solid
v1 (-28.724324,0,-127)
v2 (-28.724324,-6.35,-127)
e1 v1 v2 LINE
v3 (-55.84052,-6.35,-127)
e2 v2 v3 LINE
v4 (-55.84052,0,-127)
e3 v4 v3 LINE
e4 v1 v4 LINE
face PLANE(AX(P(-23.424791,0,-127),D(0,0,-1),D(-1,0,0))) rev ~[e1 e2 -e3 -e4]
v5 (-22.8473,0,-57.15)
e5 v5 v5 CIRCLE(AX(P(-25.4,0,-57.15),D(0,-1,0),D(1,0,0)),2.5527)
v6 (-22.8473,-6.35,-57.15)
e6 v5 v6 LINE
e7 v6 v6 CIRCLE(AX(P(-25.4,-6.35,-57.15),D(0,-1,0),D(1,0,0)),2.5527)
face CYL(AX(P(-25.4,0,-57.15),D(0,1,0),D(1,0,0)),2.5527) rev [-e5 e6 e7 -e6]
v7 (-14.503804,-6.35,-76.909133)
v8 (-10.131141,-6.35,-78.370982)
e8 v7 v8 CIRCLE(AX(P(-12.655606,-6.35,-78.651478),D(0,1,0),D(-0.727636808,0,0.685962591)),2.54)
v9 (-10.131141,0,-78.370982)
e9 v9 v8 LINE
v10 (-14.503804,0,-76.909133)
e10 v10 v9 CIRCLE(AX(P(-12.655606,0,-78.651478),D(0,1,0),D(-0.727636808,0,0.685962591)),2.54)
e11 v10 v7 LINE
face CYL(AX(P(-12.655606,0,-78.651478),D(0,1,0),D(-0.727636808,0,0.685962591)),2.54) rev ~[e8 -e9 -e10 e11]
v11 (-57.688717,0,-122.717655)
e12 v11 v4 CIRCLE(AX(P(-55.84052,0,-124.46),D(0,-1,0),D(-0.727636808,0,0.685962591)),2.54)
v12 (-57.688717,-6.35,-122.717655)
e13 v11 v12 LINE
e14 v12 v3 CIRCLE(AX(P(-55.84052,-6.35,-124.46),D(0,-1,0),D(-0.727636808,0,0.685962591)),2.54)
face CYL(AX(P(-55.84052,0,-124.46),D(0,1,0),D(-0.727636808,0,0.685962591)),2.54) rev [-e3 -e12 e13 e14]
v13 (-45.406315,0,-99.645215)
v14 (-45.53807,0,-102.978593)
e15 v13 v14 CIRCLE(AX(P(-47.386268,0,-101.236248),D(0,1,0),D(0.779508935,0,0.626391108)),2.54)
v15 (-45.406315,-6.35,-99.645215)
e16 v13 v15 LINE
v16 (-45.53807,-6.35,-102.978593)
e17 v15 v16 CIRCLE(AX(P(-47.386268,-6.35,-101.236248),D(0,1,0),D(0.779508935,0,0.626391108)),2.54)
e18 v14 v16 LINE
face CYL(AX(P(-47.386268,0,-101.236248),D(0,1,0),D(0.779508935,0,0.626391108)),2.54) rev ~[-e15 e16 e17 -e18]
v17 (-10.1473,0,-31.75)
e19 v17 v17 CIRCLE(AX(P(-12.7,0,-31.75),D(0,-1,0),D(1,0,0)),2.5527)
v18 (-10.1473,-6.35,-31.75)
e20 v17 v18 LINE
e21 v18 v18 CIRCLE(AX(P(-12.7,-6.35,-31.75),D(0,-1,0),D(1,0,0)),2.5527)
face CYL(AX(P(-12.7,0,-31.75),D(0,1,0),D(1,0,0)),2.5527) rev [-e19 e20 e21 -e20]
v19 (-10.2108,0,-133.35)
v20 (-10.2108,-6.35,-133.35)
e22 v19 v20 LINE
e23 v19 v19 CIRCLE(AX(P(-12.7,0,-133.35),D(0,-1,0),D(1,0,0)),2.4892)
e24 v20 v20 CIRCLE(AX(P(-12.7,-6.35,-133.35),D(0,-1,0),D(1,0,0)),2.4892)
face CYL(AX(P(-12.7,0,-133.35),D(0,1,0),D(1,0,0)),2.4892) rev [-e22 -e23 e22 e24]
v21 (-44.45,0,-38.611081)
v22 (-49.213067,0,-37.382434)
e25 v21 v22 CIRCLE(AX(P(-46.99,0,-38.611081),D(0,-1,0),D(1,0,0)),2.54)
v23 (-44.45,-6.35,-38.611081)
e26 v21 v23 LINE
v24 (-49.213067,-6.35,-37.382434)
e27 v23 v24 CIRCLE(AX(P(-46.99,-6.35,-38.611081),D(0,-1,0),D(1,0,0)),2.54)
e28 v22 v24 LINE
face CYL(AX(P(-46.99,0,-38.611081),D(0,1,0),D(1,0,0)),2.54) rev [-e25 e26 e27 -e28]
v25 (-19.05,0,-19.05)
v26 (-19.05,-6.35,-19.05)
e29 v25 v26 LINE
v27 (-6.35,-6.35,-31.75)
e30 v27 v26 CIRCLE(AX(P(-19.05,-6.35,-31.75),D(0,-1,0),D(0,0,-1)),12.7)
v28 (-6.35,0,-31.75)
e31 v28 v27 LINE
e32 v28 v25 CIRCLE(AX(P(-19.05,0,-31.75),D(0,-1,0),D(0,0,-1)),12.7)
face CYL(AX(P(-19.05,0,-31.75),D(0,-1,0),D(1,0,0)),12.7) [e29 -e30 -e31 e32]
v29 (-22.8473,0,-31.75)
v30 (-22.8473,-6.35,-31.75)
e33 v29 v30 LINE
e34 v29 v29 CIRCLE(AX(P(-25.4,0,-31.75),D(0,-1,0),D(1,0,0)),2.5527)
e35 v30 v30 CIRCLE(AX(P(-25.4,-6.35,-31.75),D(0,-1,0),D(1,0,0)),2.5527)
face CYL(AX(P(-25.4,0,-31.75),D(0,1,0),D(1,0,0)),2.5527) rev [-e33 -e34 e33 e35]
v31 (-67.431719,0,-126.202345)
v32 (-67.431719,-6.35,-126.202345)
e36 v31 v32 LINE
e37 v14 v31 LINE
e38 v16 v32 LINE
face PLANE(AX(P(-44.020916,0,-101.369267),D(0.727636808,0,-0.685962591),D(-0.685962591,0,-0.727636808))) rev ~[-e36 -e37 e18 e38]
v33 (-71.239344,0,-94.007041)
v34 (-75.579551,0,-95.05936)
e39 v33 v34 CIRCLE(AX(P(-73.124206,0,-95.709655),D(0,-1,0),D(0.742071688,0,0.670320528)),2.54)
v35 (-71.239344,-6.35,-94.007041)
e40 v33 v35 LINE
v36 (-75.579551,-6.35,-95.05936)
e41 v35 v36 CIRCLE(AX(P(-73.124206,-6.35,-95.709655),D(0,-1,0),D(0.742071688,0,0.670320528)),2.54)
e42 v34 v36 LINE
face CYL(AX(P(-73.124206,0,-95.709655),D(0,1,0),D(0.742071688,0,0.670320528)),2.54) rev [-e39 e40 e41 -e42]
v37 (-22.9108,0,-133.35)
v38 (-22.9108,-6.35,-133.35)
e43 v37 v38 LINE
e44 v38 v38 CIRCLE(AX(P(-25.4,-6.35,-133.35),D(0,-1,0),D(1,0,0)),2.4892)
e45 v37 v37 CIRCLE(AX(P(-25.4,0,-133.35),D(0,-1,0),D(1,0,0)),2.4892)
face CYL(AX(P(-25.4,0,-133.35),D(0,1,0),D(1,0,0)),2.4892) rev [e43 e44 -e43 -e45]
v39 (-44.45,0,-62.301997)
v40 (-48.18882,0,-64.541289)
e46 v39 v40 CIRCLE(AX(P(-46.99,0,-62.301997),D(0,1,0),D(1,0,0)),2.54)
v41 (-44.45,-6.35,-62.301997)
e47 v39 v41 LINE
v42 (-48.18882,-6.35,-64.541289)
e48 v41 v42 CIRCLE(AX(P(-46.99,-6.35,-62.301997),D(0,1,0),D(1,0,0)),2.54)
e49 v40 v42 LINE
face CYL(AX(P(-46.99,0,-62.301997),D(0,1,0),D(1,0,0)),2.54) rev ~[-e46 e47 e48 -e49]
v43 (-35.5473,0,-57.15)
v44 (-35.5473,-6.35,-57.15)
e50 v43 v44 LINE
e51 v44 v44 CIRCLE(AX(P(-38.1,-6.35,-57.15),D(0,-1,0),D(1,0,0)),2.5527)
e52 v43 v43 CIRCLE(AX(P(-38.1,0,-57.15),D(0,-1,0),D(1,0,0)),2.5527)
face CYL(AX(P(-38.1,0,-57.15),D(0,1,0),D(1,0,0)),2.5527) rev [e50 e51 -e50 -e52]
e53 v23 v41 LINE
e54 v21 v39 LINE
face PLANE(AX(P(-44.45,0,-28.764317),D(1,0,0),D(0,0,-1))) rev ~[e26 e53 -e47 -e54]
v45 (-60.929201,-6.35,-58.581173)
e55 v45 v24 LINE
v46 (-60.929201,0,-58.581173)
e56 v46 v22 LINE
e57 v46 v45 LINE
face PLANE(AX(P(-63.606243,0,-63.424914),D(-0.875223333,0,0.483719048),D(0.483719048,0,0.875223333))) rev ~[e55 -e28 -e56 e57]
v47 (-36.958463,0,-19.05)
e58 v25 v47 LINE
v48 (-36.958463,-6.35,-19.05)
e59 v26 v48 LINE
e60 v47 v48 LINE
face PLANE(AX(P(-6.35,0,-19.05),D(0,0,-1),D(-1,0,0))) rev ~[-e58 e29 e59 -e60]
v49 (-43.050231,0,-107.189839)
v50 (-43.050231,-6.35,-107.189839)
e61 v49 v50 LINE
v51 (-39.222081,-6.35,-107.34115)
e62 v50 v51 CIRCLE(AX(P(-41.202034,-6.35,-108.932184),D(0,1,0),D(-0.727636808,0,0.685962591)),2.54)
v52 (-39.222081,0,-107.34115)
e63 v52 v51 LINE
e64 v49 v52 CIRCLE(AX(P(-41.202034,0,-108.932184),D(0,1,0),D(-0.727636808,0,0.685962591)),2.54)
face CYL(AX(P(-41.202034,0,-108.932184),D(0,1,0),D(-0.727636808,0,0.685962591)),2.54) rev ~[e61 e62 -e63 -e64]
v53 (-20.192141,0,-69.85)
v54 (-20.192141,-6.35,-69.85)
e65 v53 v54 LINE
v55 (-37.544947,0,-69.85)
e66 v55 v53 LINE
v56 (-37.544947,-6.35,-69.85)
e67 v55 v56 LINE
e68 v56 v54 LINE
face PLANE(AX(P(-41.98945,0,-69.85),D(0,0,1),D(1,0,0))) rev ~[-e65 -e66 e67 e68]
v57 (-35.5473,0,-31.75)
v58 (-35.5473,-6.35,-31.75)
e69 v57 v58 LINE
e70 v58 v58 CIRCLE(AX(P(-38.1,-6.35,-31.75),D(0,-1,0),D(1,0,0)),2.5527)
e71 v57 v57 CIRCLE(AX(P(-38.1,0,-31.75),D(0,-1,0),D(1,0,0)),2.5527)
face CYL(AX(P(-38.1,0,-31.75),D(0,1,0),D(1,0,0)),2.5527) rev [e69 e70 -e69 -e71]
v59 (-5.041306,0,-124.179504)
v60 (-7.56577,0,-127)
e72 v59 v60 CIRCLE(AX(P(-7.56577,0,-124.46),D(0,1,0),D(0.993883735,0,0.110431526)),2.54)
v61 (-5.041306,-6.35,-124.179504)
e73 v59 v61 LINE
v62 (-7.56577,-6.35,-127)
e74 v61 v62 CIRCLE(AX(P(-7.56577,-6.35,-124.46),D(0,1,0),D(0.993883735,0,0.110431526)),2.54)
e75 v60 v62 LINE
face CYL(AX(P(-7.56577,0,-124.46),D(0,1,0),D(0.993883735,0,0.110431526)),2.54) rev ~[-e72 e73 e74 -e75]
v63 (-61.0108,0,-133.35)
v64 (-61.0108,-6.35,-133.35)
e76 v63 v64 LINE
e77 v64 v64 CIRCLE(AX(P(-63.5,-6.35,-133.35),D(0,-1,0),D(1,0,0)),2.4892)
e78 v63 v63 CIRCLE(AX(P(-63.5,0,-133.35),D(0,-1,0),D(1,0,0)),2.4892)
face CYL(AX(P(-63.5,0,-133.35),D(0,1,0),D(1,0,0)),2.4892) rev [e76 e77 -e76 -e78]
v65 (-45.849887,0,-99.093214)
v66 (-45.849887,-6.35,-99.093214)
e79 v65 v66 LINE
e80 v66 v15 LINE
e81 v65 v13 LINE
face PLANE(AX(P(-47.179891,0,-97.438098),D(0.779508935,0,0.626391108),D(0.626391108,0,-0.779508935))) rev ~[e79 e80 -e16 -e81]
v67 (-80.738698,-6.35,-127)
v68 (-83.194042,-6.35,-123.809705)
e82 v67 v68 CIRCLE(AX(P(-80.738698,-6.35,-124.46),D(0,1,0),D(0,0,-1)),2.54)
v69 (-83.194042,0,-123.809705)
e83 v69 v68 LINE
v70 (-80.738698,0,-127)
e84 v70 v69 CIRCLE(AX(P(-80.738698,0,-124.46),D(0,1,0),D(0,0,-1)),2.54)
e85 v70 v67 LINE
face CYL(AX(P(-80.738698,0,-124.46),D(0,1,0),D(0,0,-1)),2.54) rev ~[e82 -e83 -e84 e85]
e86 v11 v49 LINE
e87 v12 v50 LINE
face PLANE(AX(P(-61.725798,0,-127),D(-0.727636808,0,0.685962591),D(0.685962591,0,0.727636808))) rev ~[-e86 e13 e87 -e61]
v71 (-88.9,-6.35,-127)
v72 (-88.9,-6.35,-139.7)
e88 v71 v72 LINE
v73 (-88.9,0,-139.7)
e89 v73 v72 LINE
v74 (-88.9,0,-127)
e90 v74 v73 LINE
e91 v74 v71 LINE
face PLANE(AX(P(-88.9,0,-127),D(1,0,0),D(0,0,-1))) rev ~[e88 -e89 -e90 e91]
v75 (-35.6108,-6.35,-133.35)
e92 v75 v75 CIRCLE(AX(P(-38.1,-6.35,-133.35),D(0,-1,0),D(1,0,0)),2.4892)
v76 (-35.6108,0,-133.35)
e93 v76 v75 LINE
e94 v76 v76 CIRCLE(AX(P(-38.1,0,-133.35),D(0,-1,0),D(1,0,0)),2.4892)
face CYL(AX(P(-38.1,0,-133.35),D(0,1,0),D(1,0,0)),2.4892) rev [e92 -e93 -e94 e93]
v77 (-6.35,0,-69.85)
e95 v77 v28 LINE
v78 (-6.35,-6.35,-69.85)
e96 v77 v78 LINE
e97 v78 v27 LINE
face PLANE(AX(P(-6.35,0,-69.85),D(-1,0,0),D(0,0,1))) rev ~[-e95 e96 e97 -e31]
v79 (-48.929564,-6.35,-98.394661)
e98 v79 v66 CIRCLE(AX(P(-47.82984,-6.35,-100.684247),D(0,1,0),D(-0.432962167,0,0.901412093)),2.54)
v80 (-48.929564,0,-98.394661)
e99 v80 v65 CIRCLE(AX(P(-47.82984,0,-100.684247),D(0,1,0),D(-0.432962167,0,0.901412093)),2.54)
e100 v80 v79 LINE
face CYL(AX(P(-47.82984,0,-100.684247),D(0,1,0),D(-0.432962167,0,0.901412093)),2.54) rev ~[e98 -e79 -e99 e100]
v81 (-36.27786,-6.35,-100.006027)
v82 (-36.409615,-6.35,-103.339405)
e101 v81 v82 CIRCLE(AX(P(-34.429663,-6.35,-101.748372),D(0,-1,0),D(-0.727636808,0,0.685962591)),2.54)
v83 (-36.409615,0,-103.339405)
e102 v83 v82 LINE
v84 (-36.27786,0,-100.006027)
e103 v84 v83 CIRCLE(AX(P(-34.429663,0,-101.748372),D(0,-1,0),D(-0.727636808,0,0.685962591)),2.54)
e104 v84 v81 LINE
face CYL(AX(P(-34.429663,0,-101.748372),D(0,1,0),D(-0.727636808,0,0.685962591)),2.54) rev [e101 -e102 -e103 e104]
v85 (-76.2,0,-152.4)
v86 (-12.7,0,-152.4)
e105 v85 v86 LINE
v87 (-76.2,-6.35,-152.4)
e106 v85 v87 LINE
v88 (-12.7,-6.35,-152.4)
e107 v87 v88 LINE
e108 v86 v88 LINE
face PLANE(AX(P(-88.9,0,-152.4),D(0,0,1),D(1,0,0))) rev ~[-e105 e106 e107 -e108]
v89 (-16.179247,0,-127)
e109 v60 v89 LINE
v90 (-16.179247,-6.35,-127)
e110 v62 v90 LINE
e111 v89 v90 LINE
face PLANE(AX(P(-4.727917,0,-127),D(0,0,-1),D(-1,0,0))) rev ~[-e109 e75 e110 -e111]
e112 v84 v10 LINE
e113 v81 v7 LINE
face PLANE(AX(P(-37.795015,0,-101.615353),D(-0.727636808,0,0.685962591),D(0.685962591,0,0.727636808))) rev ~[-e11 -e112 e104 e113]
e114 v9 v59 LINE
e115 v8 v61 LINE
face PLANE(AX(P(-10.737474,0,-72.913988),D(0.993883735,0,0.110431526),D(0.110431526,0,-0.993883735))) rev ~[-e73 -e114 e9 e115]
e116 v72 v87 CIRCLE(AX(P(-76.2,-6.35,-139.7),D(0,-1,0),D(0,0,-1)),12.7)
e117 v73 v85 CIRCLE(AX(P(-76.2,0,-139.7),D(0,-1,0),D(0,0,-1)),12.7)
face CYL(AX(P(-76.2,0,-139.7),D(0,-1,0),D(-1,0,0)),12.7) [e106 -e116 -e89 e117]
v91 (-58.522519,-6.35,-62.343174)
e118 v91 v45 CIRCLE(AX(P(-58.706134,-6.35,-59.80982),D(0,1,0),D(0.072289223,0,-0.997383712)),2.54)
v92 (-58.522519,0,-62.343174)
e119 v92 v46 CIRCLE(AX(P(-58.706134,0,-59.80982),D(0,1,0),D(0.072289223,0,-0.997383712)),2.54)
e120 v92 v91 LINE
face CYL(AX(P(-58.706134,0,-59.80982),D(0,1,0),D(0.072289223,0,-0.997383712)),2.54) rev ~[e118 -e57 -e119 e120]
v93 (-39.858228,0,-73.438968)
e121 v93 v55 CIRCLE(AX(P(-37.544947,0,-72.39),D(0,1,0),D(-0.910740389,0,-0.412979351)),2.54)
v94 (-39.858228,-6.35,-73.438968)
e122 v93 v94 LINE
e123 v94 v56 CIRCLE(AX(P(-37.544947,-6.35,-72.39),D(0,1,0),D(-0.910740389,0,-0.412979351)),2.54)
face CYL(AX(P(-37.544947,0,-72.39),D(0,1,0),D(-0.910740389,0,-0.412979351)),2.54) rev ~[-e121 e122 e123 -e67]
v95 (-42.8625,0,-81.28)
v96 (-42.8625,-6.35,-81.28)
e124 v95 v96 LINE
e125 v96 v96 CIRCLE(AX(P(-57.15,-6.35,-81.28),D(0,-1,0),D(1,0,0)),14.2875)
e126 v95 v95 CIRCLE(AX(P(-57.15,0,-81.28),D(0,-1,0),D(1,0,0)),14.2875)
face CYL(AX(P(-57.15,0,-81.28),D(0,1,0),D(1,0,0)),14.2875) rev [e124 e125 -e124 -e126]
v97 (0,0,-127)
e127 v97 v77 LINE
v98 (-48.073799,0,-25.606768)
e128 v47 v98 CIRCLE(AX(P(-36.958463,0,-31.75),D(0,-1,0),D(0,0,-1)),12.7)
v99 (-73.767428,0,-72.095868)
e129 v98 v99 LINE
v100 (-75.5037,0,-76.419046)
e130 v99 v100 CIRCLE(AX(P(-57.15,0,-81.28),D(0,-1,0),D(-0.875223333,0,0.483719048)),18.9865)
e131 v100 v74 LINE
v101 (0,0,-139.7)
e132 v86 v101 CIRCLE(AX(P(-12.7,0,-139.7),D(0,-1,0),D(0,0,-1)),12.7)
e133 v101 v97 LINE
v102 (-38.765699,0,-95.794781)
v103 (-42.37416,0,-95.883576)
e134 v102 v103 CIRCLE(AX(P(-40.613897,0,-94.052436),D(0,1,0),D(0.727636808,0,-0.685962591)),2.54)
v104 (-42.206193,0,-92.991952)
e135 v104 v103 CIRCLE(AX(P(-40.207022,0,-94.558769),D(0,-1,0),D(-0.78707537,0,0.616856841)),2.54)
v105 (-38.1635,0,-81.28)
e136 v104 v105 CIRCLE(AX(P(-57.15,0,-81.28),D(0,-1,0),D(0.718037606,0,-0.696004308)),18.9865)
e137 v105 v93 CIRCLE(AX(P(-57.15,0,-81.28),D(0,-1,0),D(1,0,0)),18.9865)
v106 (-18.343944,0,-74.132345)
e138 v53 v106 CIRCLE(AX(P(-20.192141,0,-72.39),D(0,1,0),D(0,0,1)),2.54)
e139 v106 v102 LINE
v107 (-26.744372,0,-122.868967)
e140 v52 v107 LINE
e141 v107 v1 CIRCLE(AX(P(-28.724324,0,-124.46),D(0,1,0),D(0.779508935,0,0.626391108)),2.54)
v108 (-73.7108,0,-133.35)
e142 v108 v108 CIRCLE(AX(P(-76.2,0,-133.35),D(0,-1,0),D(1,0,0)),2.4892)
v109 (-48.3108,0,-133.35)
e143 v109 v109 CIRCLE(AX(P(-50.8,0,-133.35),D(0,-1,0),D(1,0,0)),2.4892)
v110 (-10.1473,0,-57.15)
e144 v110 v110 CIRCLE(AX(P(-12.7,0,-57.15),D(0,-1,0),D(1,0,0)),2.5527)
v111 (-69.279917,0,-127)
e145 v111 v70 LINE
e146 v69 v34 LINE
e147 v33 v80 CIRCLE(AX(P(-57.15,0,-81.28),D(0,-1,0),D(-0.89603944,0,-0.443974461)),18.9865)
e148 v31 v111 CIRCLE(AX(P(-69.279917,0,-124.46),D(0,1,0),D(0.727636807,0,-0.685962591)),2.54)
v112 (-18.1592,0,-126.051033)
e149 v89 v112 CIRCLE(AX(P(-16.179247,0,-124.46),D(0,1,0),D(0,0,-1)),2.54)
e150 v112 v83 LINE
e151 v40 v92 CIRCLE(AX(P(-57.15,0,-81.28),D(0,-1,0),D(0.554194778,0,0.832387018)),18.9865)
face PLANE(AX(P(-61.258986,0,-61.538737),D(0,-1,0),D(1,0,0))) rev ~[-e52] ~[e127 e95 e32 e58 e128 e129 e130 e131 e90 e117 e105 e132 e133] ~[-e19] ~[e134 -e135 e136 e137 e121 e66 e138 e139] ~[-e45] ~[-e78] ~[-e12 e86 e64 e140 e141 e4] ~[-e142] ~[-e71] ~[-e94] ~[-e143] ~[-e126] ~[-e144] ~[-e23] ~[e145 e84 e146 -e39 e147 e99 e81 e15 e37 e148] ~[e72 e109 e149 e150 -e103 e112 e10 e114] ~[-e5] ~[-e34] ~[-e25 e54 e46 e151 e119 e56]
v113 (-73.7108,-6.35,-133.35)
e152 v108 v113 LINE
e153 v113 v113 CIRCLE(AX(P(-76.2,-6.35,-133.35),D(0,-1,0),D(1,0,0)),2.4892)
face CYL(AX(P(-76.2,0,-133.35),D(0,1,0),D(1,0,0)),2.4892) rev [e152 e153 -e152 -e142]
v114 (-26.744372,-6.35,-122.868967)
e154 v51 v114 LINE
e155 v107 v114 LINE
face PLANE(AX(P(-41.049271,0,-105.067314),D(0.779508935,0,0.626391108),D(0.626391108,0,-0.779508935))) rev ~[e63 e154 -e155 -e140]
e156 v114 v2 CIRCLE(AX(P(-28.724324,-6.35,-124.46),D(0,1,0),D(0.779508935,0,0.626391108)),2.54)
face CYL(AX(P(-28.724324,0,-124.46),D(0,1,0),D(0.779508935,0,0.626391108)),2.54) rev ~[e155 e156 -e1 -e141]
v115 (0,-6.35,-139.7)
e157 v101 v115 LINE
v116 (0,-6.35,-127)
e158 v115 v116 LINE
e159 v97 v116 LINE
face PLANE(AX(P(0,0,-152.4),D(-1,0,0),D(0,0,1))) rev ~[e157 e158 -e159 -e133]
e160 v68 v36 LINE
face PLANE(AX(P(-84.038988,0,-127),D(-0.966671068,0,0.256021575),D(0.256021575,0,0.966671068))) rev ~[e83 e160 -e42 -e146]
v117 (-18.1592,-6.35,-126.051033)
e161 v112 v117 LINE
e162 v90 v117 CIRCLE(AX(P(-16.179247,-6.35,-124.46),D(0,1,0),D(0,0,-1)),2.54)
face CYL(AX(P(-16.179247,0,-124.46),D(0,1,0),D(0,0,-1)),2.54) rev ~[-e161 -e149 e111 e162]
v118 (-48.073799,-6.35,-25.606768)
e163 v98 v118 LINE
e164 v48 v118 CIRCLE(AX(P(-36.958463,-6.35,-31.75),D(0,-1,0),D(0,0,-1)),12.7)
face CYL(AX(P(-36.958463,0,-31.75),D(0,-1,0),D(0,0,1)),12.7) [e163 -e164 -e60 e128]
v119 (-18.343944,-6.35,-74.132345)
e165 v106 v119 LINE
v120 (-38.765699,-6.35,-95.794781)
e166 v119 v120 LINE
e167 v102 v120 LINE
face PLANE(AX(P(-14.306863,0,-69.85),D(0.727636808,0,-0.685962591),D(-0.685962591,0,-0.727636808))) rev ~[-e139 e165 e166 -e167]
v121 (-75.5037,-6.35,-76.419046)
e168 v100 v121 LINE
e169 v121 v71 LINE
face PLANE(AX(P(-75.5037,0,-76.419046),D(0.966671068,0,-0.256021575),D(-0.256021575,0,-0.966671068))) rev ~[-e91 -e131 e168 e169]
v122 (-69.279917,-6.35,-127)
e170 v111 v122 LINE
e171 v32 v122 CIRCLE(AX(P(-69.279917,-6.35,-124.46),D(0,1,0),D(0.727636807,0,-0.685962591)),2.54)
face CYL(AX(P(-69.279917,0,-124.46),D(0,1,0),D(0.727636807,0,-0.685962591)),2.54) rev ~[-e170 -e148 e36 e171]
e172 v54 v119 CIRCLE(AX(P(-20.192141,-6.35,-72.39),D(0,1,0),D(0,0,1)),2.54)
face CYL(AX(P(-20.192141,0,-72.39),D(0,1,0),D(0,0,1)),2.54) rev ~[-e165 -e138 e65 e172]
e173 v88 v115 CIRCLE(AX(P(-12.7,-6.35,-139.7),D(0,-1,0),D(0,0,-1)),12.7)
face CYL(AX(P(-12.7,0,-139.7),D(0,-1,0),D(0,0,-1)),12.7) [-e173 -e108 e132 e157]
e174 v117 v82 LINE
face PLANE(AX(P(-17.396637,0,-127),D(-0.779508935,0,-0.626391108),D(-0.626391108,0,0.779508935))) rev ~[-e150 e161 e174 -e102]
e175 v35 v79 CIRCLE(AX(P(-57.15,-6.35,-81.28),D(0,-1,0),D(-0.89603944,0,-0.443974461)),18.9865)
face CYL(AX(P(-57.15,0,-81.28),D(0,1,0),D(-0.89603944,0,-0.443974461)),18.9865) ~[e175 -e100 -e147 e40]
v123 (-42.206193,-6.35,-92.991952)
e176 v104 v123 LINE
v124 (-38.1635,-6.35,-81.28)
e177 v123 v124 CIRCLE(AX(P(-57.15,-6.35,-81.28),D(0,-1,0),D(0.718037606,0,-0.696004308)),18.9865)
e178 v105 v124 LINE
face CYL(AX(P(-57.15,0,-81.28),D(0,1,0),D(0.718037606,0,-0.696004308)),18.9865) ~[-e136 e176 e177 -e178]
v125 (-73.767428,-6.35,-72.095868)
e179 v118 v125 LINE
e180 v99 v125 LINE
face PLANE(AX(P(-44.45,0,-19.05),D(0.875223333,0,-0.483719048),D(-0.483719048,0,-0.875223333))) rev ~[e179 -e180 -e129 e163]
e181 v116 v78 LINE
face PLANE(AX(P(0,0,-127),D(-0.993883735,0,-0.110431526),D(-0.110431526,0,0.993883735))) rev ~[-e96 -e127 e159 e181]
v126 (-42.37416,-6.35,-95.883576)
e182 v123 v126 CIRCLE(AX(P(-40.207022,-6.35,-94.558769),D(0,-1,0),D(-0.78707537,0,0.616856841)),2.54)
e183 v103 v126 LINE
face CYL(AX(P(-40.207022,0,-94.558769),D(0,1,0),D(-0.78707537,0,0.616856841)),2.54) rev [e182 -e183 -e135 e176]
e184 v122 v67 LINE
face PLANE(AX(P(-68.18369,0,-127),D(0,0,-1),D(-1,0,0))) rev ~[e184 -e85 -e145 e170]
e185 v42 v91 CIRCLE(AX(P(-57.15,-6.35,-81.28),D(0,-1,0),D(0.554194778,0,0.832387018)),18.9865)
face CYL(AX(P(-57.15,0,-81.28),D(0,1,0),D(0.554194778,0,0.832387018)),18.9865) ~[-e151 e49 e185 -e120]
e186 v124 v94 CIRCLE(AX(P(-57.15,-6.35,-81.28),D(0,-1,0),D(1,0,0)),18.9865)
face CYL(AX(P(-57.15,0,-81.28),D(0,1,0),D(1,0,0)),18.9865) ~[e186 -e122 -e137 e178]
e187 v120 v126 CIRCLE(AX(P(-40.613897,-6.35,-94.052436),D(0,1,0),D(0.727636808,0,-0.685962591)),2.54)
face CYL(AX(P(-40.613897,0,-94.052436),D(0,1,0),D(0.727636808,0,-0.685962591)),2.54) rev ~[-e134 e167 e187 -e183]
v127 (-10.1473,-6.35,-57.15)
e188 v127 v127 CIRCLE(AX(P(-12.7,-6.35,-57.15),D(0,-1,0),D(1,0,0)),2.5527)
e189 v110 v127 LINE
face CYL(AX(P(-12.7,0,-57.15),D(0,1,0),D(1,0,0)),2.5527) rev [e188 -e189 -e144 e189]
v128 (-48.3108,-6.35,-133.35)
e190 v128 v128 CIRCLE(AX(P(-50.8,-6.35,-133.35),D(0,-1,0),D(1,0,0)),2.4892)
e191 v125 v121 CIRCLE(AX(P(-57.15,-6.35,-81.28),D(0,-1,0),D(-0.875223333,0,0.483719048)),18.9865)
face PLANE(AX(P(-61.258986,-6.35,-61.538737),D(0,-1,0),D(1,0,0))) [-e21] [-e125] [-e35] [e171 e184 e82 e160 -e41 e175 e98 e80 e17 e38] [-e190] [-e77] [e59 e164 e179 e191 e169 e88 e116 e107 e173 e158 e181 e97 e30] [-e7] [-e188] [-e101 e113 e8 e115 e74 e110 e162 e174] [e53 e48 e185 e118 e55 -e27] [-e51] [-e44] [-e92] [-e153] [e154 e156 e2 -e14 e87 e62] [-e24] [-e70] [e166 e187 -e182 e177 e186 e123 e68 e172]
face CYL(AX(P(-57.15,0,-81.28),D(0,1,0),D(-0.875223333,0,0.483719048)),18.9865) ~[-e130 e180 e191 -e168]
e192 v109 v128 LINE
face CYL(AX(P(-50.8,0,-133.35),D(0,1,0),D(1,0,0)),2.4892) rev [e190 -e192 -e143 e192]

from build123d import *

# Parameters (mm, degrees)
F0_R        = 14.2875
F0_R_2      = 2.4892
F0_R_3      = 2.5527
F1_DEPTH    = 6.35
F2_R        = 12.7
F3_T1_DEPTH = 6.35


# Not quite as in the source:
# - a fillet or chamfer that OpenCascade refuses, or shapes differently, is made with other operations: its cross-section is extruded or revolved along the edge and cut away or added


with BuildPart() as f1:
    # F0 (on Front) → F1 (new body)
    with BuildSketch(Plane.XZ):
        with BuildLine():
            ThreePointArc((-73.767427816, -72.0958683029), (-74.7686667008, -74.2040007111), (-75.5037002278, -76.4190463696))
            ThreePointArc((-75.5037002278, -76.4190463696), (-76.040577327, -83.1861139792), (-74.1626528233, -89.7095211112))
            ThreePointArc((-74.1626528233, -89.7095211112), (-62.3780093009, -99.5325368374), (-47.1798914821, -97.4380976105))
            ThreePointArc((-47.1798914821, -97.4380976105), (-45.257025222, -96.0801463905), (-43.5169789975, -94.4946857926))
            ThreePointArc((-43.5169789975, -94.4946857926), (-39.5526914627, -88.4089490455), (-38.1635, -81.28))
            ThreePointArc((-38.1635, -81.28), (-39.1453760307, -75.2533344231), (-41.9894498038, -69.85))
            Line((-41.9894498038, -69.85), (-44.1945328452, -69.85))
            Line((-44.1945328452, -69.85), (-44.45, -69.85))
            Line((-44.45, -69.85), (-44.45, -67.1662768112))
            ThreePointArc((-44.45, -67.1662768112), (-45.5081692727, -66.2815014229), (-46.6277808452, -65.4758838808))
            ThreePointArc((-46.6277808452, -65.4758838808), (-54.8730151863, -62.430529917), (-63.6062431678, -63.4249137104))
            ThreePointArc((-63.6062431678, -63.4249137104), (-69.474566384, -66.8372770678), (-73.767427816, -72.0958683029))
        make_face()
        with Locations((-57.15, -81.28)):
            Circle(F0_R, mode=Mode.SUBTRACT)
        with BuildLine():
            Line((-44.45, -28.7643166542), (-44.45, -19.05))
            Line((-44.45, -19.05), (-73.767427816, -72.0958683029))
            ThreePointArc((-73.767427816, -72.0958683029), (-69.474566384, -66.8372770678), (-63.6062431678, -63.4249137104))
            Line((-63.6062431678, -63.4249137104), (-44.45, -28.7643166542))
        make_face()
        with BuildLine():
            Line((-75.5037002278, -76.4190463696), (-88.9, -127))
            Line((-88.9, -127), (-84.0389876487, -127))
            Line((-84.0389876487, -127), (-74.1626528233, -89.7095211112))
            ThreePointArc((-74.1626528233, -89.7095211112), (-76.040577327, -83.1861139792), (-75.5037002278, -76.4190463696))
        make_face()
        Polygon((-84.0389876487, -127), (-88.9, -127), (-88.9, -152.4), (0, -152.4), (0, -127), (-4.727917196, -127), (-17.3966372237, -127), (-23.4247913477, -127), (-61.7257976966, -127), (-68.1836898087, -127), align=None)
        with Locations((-76.2, -133.35)):
            Circle(F0_R_2, mode=Mode.SUBTRACT)
        with Locations((-63.5, -133.35)):
            Circle(F0_R_2, mode=Mode.SUBTRACT)
        with Locations((-50.8, -133.35)):
            Circle(F0_R_2, mode=Mode.SUBTRACT)
        with Locations((-38.1, -133.35)):
            Circle(F0_R_2, mode=Mode.SUBTRACT)
        with Locations((-25.4, -133.35)):
            Circle(F0_R_2, mode=Mode.SUBTRACT)
        with Locations((-12.7, -133.35)):
            Circle(F0_R_2, mode=Mode.SUBTRACT)
        Polygon((-4.727917196, -127), (0, -127), (-6.35, -69.85), (-11.077917196, -69.85), (-10.7374740973, -72.913987888), align=None)
        with BuildLine():
            Line((-6.35, -69.85), (-6.35, -19.05))
            Line((-6.35, -19.05), (-44.45, -19.05))
            Line((-44.45, -19.05), (-44.45, -28.7643166542))
            Line((-44.45, -28.7643166542), (-44.45, -62.9496581004))
            Line((-44.45, -62.9496581004), (-44.45, -67.1662768112))
            ThreePointArc((-44.45, -67.1662768112), (-43.7416474883, -67.8374085396), (-43.0687114356, -68.5440471649))
            ThreePointArc((-43.0687114356, -68.5440471649), (-42.5145067823, -69.1849795153), (-41.9894498038, -69.85))
            Line((-41.9894498038, -69.85), (-14.3068632521, -69.85))
            Line((-14.3068632521, -69.85), (-11.077917196, -69.85))
            Line((-11.077917196, -69.85), (-6.35, -69.85))
        make_face()
        with Locations((-38.1, -57.15)):
            Circle(F0_R_3, mode=Mode.SUBTRACT)
        with Locations((-25.4, -57.15)):
            Circle(F0_R_3, mode=Mode.SUBTRACT)
        with Locations((-12.7, -57.15)):
            Circle(F0_R_3, mode=Mode.SUBTRACT)
        with Locations((-38.1, -31.75)):
            Circle(F0_R_3, mode=Mode.SUBTRACT)
        with Locations((-25.4, -31.75)):
            Circle(F0_R_3, mode=Mode.SUBTRACT)
        with Locations((-12.7, -31.75)):
            Circle(F0_R_3, mode=Mode.SUBTRACT)
        Polygon((-44.0209157758, -101.3692673783), (-68.1836898087, -127), (-61.7257976966, -127), (-41.0492709397, -105.0673142856), align=None)
        Polygon((-40.7666595063, -97.9173056039), (-44.0209157758, -101.3692673783), (-41.0492709397, -105.0673142856), (-37.7950146701, -101.6153525111), align=None)
        Polygon((-10.7374740973, -72.913987888), (-11.077917196, -69.85), (-14.3068632521, -69.85), (-40.7666595063, -97.9173056039), (-37.7950146701, -101.6153525111), align=None)
        with BuildLine():
            Line((-47.1798914821, -97.4380976105), (-44.0209157758, -101.3692673783))
            Line((-44.0209157758, -101.3692673783), (-40.7666595063, -97.9173056039))
            Line((-40.7666595063, -97.9173056039), (-43.5169789975, -94.4946857926))
            ThreePointArc((-43.5169789975, -94.4946857926), (-45.257025222, -96.0801463905), (-47.1798914821, -97.4380976105))
        make_face()
        Polygon((-23.4247913477, -127), (-17.3966372237, -127), (-37.7950146701, -101.6153525111), (-41.0492709397, -105.0673142856), align=None)
        with BuildLine():
            ThreePointArc((-43.0687114356, -68.5440471649), (-43.7416474883, -67.8374085396), (-44.45, -67.1662768112))
            Line((-44.45, -67.1662768112), (-44.45, -69.85))
            Line((-44.45, -69.85), (-44.1945328452, -69.85))
            Line((-44.1945328452, -69.85), (-43.0687114356, -68.5440471649))
        make_face()
        with BuildLine():
            Line((-44.1945328452, -69.85), (-41.9894498038, -69.85))
            ThreePointArc((-41.9894498038, -69.85), (-42.5145067823, -69.1849795153), (-43.0687114356, -68.5440471649))
            Line((-43.0687114356, -68.5440471649), (-44.1945328452, -69.85))
        make_face()
    extrude(amount=F1_DEPTH)

    # F2
    f2_edges = [f1.edges().sort_by_distance(p)[0] for p in [
        (-6.35, -3.175, -19.05),
        (-88.9, -3.175, -152.4),
        (0, -3.175, -152.4),
        (-44.45, -3.175, -19.05),
    ]]
    fillet(f2_edges, radius=F2_R)

    # F3: fillet of radius 2.54 on 21 edges, made by hand

    # F3_s2 → F3_t1 (join)
    with BuildSketch(Plane.XZ):
        with BuildLine():
            ThreePointArc((-58.5225193342, -62.3431741591), (-60.8457611864, -61.1786129184), (-60.9292012272, -58.5811731507))
            Line((-60.9292012272, -58.5811731507), (-63.6062431678, -63.4249137104))
            ThreePointArc((-63.6062431678, -63.4249137104), (-61.1015719267, -62.7092633006), (-58.5225193342, -62.3431741591))
        make_face()
        with BuildLine():
            ThreePointArc((-42.2061934884, -92.9919524074), (-42.7469750096, -94.5742269942), (-42.1869747431, -96.1498021981))
            Line((-42.1869747431, -96.1498021981), (-43.5169789975, -94.4946857926))
            ThreePointArc((-43.5169789975, -94.4946857926), (-42.8418442978, -93.7605393574), (-42.2061934884, -92.9919524074))
        make_face()
        with BuildLine():
            ThreePointArc((-48.929563825, -98.3946607137), (-47.2679726242, -98.2071715059), (-45.8498872277, -99.0932140161))
            Line((-45.8498872277, -99.0932140161), (-47.1798914821, -97.4380976105))
            ThreePointArc((-47.1798914821, -97.4380976105), (-48.0421609425, -97.9393652326), (-48.929563825, -98.3946607137))
        make_face()
        with BuildLine():
            ThreePointArc((-71.2393441045, -94.007040699), (-73.7227097824, -93.2411748511), (-75.5795507042, -95.0593600393))
            Line((-75.5795507042, -95.0593600393), (-74.1626528233, -89.7095211112))
            ThreePointArc((-74.1626528233, -89.7095211112), (-72.8487490545, -91.958785529), (-71.2393441045, -94.007040699))
        make_face()
        with BuildLine():
            ThreePointArc((-44.45, -38.6110805765), (-46.35556752, -36.1515896884), (-49.2130672664, -37.3824341956))
            Line((-49.2130672664, -37.3824341956), (-44.45, -28.7643166542))
            Line((-44.45, -28.7643166542), (-44.45, -38.6110805765))
        make_face()
        with BuildLine():
            ThreePointArc((-38.7656990781, -95.7947810274), (-40.7142143439, -96.5904542384), (-42.5938492637, -95.6434694613))
            Line((-42.5938492637, -95.6434694613), (-40.7666595063, -97.9173056039))
            Line((-40.7666595063, -97.9173056039), (-38.7656990781, -95.7947810274))
        make_face()
        with BuildLine():
            ThreePointArc((-67.4317191857, -126.2023449812), (-68.2734267993, -126.7920759263), (-69.2799166769, -127))
            Line((-69.2799166769, -127), (-68.1836898087, -127))
            Line((-68.1836898087, -127), (-67.4317191857, -126.2023449812))
        make_face()
        with BuildLine():
            ThreePointArc((-80.7386977088, -127), (-82.7515748526, -126.0091693271), (-83.1940422209, -123.8097051999))
            Line((-83.1940422209, -123.8097051999), (-84.0389876487, -127))
            Line((-84.0389876487, -127), (-80.7386977088, -127))
        make_face()
        with BuildLine():
            ThreePointArc((-20.1921413698, -69.85), (-17.8600654435, -71.3835101223), (-18.3439438786, -74.1323449812))
            Line((-18.3439438786, -74.1323449812), (-14.3068632521, -69.85))
            Line((-14.3068632521, -69.85), (-20.1921413698, -69.85))
        make_face()
        with BuildLine():
            ThreePointArc((-45.4063150305, -99.6452149726), (-44.8482495326, -101.3365661623), (-45.5380702337, -102.9785933689))
            Line((-45.5380702337, -102.9785933689), (-44.0209157758, -101.3692673783))
            Line((-44.0209157758, -101.3692673783), (-45.4063150305, -99.6452149726))
        make_face()
        with BuildLine():
            ThreePointArc((-43.0502313678, -107.1898388621), (-41.1017161021, -106.394165651), (-39.2220811823, -107.3411504281))
            Line((-39.2220811823, -107.3411504281), (-41.0492709397, -105.0673142856))
            Line((-41.0492709397, -105.0673142856), (-43.0502313678, -107.1898388621))
        make_face()
        with BuildLine():
            ThreePointArc((-36.2778602123, -100.0060265206), (-36.9676809133, -101.6480537272), (-36.4096154155, -103.3394049169))
            Line((-36.4096154155, -103.3394049169), (-37.7950146701, -101.6153525111))
            Line((-37.7950146701, -101.6153525111), (-36.2778602123, -100.0060265206))
        make_face()
        with BuildLine():
            ThreePointArc((-57.68871707, -122.7176550188), (-58.1725955051, -125.4664898777), (-55.8405195788, -127))
            Line((-55.8405195788, -127), (-61.7257976966, -127))
            Line((-61.7257976966, -127), (-57.68871707, -122.7176550188))
        make_face()
        with BuildLine():
            ThreePointArc((-26.7443717706, -122.8689665849), (-26.4338196217, -125.5578103492), (-28.724324465, -127))
            Line((-28.724324465, -127), (-23.4247913477, -127))
            Line((-23.4247913477, -127), (-26.7443717706, -122.8689665849))
        make_face()
        with BuildLine():
            ThreePointArc((-5.0413056489, -124.1795039238), (-5.6731451696, -126.1539805144), (-7.565770335, -127))
            Line((-7.565770335, -127), (-4.727917196, -127))
            Line((-4.727917196, -127), (-5.0413056489, -124.1795039238))
        make_face()
        with BuildLine():
            ThreePointArc((-14.5038036224, -76.9091328532), (-11.8502584516, -76.2425330207), (-10.1311414451, -78.3709817581))
            Line((-10.1311414451, -78.3709817581), (-10.7374740973, -72.913987888))
            Line((-10.7374740973, -72.913987888), (-14.5038036224, -76.9091328532))
        make_face()
        with BuildLine():
            ThreePointArc((-16.1792469636, -127), (-17.2770573128, -126.7505048433), (-18.159199658, -126.0510334151))
            Line((-18.159199658, -126.0510334151), (-17.3966372237, -127))
            Line((-17.3966372237, -127), (-16.1792469636, -127))
        make_face()
        with BuildLine():
            ThreePointArc((-39.8582276098, -73.4389675516), (-39.6798917034, -71.0139145341), (-37.5449470225, -69.85))
            Line((-37.5449470225, -69.85), (-41.9894498038, -69.85))
            ThreePointArc((-41.9894498038, -69.85), (-40.8249124862, -71.5857388153), (-39.8582276098, -73.4389675516))
        make_face()
        with BuildLine():
            ThreePointArc((-44.45, -62.3019968846), (-45.6848952053, -64.4810566531), (-48.188820059, -64.5412892876))
            ThreePointArc((-48.188820059, -64.5412892876), (-46.2401732835, -65.7409246328), (-44.45, -67.1662768112))
            Line((-44.45, -67.1662768112), (-44.45, -62.3019968846))
        make_face()
    extrude(amount=F3_T1_DEPTH)


solid = f1.part
